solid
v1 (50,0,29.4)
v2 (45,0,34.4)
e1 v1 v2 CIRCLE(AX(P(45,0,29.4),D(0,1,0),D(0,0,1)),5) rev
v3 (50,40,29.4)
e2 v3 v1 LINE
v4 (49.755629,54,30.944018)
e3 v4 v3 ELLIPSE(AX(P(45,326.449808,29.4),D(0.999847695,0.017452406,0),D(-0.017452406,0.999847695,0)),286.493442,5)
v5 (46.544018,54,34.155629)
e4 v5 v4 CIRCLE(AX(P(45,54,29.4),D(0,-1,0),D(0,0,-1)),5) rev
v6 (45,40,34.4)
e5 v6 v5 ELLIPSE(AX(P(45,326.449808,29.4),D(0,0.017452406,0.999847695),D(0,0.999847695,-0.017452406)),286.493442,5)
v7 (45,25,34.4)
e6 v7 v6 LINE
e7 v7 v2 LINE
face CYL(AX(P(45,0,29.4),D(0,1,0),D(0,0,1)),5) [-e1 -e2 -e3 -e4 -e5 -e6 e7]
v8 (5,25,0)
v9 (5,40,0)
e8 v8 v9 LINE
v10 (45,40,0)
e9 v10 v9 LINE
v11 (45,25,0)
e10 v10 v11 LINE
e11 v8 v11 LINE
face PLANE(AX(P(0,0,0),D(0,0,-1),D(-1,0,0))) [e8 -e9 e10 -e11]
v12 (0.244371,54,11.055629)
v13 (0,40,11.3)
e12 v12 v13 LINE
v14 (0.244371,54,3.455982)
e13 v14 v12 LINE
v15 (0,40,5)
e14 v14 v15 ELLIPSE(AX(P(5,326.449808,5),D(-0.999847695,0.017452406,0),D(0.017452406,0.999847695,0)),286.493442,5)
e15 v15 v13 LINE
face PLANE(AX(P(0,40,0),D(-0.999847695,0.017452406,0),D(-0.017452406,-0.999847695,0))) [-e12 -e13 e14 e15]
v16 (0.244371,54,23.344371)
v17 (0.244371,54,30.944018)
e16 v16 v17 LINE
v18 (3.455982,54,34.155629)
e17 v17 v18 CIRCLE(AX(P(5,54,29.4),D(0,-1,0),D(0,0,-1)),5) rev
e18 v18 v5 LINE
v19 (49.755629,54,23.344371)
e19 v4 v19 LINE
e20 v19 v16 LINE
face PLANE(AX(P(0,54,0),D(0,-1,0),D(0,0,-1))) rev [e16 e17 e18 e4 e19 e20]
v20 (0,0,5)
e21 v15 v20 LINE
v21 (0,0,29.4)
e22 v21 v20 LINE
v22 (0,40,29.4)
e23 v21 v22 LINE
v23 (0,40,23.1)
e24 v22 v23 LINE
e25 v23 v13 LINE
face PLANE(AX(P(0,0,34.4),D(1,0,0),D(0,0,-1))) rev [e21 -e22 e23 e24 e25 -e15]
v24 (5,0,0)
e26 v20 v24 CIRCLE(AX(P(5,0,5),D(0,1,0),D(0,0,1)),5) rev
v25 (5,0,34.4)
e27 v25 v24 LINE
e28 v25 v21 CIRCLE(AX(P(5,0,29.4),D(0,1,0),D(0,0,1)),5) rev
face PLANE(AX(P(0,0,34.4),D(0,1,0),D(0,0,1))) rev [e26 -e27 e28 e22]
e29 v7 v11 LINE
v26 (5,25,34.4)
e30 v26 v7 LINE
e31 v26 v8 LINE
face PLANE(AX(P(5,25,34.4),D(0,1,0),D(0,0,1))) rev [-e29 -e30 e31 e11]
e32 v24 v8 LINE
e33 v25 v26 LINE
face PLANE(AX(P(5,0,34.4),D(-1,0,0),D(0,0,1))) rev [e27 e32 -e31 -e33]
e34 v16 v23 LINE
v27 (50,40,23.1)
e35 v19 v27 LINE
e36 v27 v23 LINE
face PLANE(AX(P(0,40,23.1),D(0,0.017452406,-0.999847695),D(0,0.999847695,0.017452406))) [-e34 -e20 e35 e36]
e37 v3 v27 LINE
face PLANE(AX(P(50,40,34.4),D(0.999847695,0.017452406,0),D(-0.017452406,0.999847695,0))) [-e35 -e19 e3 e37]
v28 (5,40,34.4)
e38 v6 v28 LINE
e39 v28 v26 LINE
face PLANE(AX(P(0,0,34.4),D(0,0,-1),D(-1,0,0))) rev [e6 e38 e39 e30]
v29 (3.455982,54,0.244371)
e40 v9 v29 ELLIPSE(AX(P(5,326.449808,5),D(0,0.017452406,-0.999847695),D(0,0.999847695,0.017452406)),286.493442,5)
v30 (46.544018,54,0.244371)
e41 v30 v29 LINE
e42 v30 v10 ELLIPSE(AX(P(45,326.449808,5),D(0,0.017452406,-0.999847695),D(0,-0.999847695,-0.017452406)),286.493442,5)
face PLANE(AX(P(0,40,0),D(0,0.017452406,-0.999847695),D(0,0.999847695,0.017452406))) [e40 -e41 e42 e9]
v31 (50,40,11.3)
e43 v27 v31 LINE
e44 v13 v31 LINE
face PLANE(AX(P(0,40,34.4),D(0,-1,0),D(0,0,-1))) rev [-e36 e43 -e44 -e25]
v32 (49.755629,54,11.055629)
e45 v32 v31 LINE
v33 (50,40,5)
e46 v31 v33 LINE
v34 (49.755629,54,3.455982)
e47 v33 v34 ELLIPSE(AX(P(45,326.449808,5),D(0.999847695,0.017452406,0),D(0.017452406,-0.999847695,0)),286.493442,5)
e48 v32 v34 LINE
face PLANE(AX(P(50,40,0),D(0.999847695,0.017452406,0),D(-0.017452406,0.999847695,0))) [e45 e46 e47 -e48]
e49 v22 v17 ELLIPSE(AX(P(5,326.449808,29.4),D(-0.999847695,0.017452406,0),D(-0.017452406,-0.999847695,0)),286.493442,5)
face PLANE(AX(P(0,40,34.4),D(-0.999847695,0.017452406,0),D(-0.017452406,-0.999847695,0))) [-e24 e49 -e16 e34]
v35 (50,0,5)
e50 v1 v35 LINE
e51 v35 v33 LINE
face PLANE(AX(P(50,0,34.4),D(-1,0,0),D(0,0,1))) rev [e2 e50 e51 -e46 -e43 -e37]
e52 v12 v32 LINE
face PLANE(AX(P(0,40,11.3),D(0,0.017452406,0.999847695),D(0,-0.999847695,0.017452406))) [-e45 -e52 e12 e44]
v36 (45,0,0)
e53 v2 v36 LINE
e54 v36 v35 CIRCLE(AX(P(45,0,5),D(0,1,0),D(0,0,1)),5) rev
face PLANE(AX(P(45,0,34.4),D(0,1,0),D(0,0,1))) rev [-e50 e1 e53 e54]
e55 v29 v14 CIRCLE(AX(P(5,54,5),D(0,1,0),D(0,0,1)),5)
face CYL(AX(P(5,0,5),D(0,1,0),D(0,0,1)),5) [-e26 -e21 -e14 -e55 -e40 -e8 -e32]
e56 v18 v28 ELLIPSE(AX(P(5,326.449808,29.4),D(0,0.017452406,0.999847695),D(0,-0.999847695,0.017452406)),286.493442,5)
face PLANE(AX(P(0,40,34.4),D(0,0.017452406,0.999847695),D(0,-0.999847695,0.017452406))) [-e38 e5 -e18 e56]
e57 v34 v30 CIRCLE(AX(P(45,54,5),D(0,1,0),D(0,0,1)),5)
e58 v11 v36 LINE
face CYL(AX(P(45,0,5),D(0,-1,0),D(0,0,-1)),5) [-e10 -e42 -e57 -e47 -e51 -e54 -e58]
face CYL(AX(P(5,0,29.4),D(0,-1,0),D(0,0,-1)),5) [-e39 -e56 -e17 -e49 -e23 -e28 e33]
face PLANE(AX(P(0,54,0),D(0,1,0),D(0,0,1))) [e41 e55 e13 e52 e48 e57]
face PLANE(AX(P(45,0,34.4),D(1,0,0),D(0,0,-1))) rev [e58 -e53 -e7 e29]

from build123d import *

# Parameters (mm, degrees)
BOSS_EXTRUDE1_DEPTH           = 34.4
SKETCH2_W                     = 50
SKETCH2_H                     = 11.3
BOSS_EXTRUDE2_DEPTH           = 14
BOSS_EXTRUDE2_DRAFT           = 1
BOSS_EXTRUDE2_PROFILE_2_DEPTH = 14
BOSS_EXTRUDE2_PROFILE_2_DRAFT = 1
FILLET1_R                     = 5


with BuildPart() as part:
    # Sketch1 → Boss-Extrude1 (new body)
    with BuildSketch(Plane.XY):
        Polygon((45, 0), (50, 0), (50, 40), (0, 40), (0, 0), (5, 0), (5, 25), (45, 25), align=None)
    extrude(amount=BOSS_EXTRUDE1_DEPTH)


with BuildPart() as boss_extrude2_tool:
    # Sketch2 → Boss-Extrude2 (with draft: the straight prism first)
    with BuildSketch(Plane(origin=(0, 40, 0), x_dir=(1, 0, 0), z_dir=(0, 1, 0))):
        with Locations((25, -5.65)):
            Rectangle(SKETCH2_W, SKETCH2_H)
    extrude(amount=BOSS_EXTRUDE2_DEPTH)
    # Boss-Extrude2: the draft: its side faces are tilted about the plane it starts from
    boss_extrude2_sides = [boss_extrude2_tool.faces().sort_by_distance(p)[0] for p in [
        (0, 47, 5.65),
        (25, 47, 11.3),
        (50, 47, 5.65),
        (25, 47, 0),
    ]]
    draft(boss_extrude2_sides, Plane(origin=(0, 40, 0), x_dir=(1, 0, 0), z_dir=(0, 1, 0)), BOSS_EXTRUDE2_DRAFT)


with BuildPart() as part_1:
    add(part.part)

    # Boss-Extrude2: add boss_extrude2_tool
    add(boss_extrude2_tool.part)


with BuildPart() as boss_extrude2_profile_2_tool:
    # Sketch2 → Boss-Extrude2 profile 2 (with draft: the straight prism first)
    with BuildSketch(Plane(origin=(0, 40, 0), x_dir=(1, 0, 0), z_dir=(0, 1, 0))):
        with Locations((25, -28.75)):
            Rectangle(SKETCH2_W, SKETCH2_H)
    extrude(amount=BOSS_EXTRUDE2_PROFILE_2_DEPTH)
    # Boss-Extrude2 profile 2: the draft: its side faces are tilted about the plane it starts from
    boss_extrude2_profile_2_sides = [boss_extrude2_profile_2_tool.faces().sort_by_distance(p)[0] for p in [
        (25, 47, 34.4),
        (50, 47, 28.75),
        (25, 47, 23.1),
        (0, 47, 28.75),
    ]]
    draft(boss_extrude2_profile_2_sides, Plane(origin=(0, 40, 0), x_dir=(1, 0, 0), z_dir=(0, 1, 0)), BOSS_EXTRUDE2_PROFILE_2_DRAFT)


with BuildPart() as part_2:
    add(part_1.part)

    # Boss-Extrude2 profile 2: add boss_extrude2_profile_2_tool
    add(boss_extrude2_profile_2_tool.part)

    # Fillet1
    # the kernel refuses this fillet: 5 mm, written as the material it takes off along each edge
    with BuildSketch(Plane(origin=(50, -30, 34.4), x_dir=(-1, 0, 0), z_dir=(0, 1, 0)), Plane(origin=(0, 70, 0), x_dir=(0, 0, 1), z_dir=(0, -1, 0))) as fillet1_piece_1:
        with BuildLine():
            CenterArc((FILLET1_R, -FILLET1_R), FILLET1_R, 90, 90)
            Line((0, -FILLET1_R), (-FILLET1_R * 0.02, -FILLET1_R))
            Line((-FILLET1_R * 0.02, -FILLET1_R), (-FILLET1_R * 0.02, FILLET1_R * 0.02))
            Line((-FILLET1_R * 0.02, FILLET1_R * 0.02), (FILLET1_R, FILLET1_R * 0.02))
            Line((FILLET1_R, FILLET1_R * 0.02), (FILLET1_R, 0))
        make_face()
    extrude(amount=100, mode=Mode.SUBTRACT)
    with BuildSketch(Plane(origin=(50, -30, 0), x_dir=(-1, 0, 0), z_dir=(0, 1, 0)), Plane(origin=(0, 70, 34.4), x_dir=(0, 0, -1), z_dir=(0, -1, 0))) as fillet1_piece_2:
        with BuildLine():
            CenterArc((FILLET1_R, FILLET1_R), FILLET1_R, 180, 90)
            Line((0, FILLET1_R), (-FILLET1_R * 0.02, FILLET1_R))
            Line((-FILLET1_R * 0.02, FILLET1_R), (-FILLET1_R * 0.02, -FILLET1_R * 0.02))
            Line((-FILLET1_R * 0.02, -FILLET1_R * 0.02), (FILLET1_R, -FILLET1_R * 0.02))
            Line((FILLET1_R, -FILLET1_R * 0.02), (FILLET1_R, 0))
        make_face()
    extrude(amount=100, mode=Mode.SUBTRACT)


solid = part_2.part
